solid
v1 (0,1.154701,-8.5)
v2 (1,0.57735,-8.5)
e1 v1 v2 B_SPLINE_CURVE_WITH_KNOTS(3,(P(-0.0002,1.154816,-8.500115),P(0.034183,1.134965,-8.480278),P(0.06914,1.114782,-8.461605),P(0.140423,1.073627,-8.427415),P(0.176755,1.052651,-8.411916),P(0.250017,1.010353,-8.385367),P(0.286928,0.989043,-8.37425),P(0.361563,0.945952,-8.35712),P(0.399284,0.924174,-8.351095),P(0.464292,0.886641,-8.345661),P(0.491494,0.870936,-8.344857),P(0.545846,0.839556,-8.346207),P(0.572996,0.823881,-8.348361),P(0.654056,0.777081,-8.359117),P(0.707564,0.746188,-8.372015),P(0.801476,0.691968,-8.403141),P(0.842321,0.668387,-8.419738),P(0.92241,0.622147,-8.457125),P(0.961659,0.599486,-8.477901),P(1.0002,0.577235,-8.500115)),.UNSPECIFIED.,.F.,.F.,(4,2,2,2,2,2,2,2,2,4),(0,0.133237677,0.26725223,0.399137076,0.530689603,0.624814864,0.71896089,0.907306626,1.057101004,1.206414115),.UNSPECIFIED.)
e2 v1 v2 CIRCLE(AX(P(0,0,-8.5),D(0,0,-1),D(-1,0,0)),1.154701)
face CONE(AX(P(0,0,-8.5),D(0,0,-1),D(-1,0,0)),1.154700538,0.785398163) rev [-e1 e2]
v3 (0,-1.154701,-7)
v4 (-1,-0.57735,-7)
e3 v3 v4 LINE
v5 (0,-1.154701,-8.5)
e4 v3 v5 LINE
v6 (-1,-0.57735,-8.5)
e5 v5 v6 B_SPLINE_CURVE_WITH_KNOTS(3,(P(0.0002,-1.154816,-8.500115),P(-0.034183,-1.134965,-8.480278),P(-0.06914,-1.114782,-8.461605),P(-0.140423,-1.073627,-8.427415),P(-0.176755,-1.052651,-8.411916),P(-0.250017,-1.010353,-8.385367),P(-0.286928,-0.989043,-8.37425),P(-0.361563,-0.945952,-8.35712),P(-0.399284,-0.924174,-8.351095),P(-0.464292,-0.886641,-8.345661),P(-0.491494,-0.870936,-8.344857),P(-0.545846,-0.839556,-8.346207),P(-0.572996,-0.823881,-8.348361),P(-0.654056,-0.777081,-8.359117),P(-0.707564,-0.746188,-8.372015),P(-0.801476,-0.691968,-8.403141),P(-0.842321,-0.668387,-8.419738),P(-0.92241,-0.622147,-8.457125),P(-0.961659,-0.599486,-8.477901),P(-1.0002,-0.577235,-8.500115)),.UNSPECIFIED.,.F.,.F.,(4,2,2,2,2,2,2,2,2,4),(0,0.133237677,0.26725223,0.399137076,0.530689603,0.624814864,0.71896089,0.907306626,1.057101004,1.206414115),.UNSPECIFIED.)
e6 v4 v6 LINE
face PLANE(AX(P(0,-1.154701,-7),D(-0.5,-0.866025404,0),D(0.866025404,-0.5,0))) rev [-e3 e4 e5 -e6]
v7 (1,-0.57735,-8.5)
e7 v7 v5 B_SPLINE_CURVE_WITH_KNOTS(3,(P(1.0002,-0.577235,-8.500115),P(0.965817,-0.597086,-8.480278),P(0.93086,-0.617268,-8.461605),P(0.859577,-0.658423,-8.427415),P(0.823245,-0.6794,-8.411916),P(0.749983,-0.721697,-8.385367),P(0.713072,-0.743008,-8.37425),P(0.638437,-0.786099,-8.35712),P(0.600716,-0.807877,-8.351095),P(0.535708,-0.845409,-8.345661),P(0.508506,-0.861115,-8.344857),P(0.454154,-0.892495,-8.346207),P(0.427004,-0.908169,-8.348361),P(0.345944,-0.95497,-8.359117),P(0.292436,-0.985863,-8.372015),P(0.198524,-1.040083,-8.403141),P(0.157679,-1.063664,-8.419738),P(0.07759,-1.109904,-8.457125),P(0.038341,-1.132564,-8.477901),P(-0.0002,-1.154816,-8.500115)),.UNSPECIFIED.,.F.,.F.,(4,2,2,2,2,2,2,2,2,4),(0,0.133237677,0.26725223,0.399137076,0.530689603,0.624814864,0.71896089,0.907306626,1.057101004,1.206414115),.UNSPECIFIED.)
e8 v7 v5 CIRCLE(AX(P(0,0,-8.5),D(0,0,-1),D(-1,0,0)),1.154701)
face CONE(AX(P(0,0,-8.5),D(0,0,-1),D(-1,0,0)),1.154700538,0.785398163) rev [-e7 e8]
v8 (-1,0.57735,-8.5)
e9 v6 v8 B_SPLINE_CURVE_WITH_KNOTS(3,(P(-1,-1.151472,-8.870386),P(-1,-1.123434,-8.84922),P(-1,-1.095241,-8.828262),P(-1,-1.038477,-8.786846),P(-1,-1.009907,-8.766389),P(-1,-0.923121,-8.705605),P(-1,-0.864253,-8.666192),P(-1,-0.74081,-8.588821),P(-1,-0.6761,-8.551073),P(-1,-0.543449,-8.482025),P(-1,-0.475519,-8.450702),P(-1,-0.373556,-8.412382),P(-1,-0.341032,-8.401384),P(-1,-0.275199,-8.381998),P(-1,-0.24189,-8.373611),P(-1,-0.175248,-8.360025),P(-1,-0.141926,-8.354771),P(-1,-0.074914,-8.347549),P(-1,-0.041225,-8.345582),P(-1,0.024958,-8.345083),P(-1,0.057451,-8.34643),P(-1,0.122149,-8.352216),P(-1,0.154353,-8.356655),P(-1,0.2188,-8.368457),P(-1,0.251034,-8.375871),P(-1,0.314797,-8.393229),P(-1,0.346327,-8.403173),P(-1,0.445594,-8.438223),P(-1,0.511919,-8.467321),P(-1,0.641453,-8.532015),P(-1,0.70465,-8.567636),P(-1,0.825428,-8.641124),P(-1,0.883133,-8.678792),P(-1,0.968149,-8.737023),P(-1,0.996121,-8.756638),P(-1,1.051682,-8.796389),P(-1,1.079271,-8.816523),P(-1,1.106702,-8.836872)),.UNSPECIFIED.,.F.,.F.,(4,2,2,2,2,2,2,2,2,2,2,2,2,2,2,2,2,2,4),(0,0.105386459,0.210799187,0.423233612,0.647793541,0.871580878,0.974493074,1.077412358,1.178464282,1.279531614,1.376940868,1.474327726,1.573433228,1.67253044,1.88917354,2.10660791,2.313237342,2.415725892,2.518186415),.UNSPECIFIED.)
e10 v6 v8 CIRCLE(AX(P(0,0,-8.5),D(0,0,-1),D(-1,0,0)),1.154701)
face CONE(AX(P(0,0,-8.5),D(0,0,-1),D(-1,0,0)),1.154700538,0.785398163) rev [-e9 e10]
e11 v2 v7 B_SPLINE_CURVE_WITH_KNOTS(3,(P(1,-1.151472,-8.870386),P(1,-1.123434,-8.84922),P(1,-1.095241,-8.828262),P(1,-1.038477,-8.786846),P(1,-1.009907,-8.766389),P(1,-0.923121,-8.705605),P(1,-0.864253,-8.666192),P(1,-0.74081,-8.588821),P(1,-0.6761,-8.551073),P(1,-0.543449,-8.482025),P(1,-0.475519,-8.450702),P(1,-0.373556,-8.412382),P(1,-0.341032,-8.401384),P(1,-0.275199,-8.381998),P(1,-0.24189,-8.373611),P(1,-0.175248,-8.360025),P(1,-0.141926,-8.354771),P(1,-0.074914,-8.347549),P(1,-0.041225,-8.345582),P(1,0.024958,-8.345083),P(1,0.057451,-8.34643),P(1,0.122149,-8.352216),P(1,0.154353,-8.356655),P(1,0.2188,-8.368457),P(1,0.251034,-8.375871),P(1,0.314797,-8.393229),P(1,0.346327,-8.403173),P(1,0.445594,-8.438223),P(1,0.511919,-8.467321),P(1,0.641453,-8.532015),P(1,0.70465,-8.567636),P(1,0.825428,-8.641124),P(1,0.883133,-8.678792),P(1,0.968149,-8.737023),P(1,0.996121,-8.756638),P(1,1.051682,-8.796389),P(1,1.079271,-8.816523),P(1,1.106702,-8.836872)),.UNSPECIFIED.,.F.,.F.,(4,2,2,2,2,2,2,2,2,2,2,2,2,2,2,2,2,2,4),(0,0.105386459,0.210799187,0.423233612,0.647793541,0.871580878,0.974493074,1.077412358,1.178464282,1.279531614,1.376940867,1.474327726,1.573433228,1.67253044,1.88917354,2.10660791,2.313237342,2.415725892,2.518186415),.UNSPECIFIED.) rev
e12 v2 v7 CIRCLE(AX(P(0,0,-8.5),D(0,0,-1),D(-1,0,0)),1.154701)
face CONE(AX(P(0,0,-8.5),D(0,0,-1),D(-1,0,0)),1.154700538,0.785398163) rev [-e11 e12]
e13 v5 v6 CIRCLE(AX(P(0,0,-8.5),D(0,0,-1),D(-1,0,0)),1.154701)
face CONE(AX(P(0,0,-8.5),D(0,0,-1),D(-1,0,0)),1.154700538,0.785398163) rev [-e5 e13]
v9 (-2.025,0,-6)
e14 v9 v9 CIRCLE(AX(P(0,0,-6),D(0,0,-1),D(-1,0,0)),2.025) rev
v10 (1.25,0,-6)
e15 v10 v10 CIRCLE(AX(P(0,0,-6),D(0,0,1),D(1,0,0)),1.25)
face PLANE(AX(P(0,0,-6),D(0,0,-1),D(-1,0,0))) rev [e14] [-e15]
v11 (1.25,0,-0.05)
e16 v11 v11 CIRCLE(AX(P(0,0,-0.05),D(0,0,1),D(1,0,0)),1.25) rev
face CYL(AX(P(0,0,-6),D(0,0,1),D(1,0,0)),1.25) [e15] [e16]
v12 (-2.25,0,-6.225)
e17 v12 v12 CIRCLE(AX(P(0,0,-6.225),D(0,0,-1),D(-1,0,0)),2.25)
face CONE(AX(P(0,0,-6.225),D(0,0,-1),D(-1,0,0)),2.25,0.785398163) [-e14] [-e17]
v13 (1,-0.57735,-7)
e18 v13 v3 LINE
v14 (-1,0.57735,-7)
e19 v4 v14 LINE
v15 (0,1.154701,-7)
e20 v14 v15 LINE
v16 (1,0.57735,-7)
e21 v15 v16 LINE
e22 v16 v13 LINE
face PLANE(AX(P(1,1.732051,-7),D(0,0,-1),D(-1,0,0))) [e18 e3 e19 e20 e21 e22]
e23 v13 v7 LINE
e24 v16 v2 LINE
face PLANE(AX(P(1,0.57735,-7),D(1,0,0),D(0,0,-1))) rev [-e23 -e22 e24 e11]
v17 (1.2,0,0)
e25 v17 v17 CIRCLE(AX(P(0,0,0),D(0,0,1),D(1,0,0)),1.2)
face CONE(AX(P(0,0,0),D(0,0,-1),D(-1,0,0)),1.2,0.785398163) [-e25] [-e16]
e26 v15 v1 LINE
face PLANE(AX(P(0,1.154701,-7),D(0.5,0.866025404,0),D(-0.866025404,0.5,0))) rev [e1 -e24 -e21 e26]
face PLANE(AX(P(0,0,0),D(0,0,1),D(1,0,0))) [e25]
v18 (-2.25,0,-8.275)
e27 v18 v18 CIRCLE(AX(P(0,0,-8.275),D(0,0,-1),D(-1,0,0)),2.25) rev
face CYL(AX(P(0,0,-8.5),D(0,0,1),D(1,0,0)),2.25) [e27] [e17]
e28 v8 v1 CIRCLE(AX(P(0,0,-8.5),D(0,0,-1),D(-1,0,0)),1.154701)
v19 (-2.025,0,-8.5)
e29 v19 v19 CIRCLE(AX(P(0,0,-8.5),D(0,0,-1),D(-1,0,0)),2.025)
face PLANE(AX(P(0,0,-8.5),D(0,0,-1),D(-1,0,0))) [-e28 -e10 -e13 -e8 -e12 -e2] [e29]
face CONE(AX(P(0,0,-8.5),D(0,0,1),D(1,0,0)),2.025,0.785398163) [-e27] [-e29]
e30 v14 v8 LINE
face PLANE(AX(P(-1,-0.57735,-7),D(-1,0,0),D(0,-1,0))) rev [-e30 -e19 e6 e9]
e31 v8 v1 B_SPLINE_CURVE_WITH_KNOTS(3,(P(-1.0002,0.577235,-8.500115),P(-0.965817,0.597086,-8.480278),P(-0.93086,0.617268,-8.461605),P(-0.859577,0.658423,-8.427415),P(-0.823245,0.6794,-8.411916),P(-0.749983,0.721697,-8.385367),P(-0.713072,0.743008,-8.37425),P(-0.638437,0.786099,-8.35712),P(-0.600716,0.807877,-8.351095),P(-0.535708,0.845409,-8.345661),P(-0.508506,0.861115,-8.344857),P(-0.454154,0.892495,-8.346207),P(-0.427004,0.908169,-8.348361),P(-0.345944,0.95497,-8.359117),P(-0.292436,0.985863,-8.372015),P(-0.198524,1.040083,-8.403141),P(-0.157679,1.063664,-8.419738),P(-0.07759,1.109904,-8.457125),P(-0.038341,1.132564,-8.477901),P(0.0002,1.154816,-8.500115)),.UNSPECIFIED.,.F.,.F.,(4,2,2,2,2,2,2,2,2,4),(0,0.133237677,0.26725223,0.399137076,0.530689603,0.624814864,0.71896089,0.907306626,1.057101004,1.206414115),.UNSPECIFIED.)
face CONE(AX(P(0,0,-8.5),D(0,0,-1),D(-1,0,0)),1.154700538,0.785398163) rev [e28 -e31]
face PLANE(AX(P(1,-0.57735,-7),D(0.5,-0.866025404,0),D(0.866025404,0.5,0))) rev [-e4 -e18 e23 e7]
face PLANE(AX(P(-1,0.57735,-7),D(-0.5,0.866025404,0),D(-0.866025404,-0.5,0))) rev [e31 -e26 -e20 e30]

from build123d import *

# Parameters (mm, degrees)
SKETCH1_R            = 1.25
EXTRUDE1_DEPTH       = 6
CUT_SWEEP1_PITCH     = 0.45
SKETCH6_R            = 2.25
EXTRUDE2_DEPTH       = 2.5
CUT_EXTRUDE1_DEPTH   = 1.5
CHAMFER1_SIZE        = 0.225
SKETCH10_R           = 1.25
PARTIAL_THREAD_DEPTH = 6
CHAMFER2_SIZE        = 0.05


with BuildPart() as part:
    # Sketch1 → Extrude1 (new body)
    with BuildSketch(Plane.XY):
        Circle(SKETCH1_R)
    extrude(amount=-EXTRUDE1_DEPTH)

    # Cut-Sweep1: arcs per turn and ends read off the stored shape
    # Cut-Sweep1: the profile of Sketch3 profile screwed along a right-hand helix through 16 turns, 6 arcs to a turn; built about Z, then put on its axis
    cut_sweep1_z = Axis((0, 0, 0), (0, 0, 1))
    cut_sweep1_corners = [(1.2503, 0, -0.843923205), (0.957716426, 0, -0.675), (0.957716426, 0, -0.61875), (1.2503, 0, -0.449826795)]
    with BuildLine(mode=Mode.PRIVATE) as cut_sweep1_profile:
        Line(cut_sweep1_corners[0], cut_sweep1_corners[1])
        Line(cut_sweep1_corners[1], cut_sweep1_corners[2])
        Line(cut_sweep1_corners[2], cut_sweep1_corners[3])
        Line(cut_sweep1_corners[3], cut_sweep1_corners[0])
    cut_sweep1_cap = Face(cut_sweep1_profile.wire())
    cut_sweep1_turn_angles = [0, 30, 60, 90, 120, 150, 180, 210, 240, 270, 300, 330, 360]
    cut_sweep1_turn_weights = [1, 0.8660254037844387, 1, 0.8660254037844387, 1, 0.8660254037844387, 1, 0.8660254037844387, 1, 0.8660254037844387, 1, 0.8660254037844387, 1]
    cut_sweep1_turn_rails = [Edge.make_bspline([Vector(p[0], p[1], 0).rotate(cut_sweep1_z, cut_sweep1_turn_angles[k]) / cut_sweep1_turn_weights[k] + Vector(0, 0, p[2] + CUT_SWEEP1_PITCH * cut_sweep1_turn_angles[k] / 360) for k in range(13)], [0, 0, 0, 1, 1, 2, 2, 3, 3, 4, 4, 5, 5, 6, 6, 6], 2, cut_sweep1_turn_weights) for p in cut_sweep1_corners]
    cut_sweep1_turn_sides = [Face.make_surface_from_curves(cut_sweep1_turn_rails[p[0]], cut_sweep1_turn_rails[p[1]]) for p in [(0, 1), (1, 2), (2, 3), (3, 0)]]
    cut_sweep1 = Plane(origin=(0, 0, 0), x_dir=(0, 1, 0), z_dir=(0, 0, -1)) * Solid(Shell([*[p.moved(Location((0, 0, CUT_SWEEP1_PITCH * i))) for i in range(16) for p in cut_sweep1_turn_sides], cut_sweep1_cap, cut_sweep1_cap.rotate(cut_sweep1_z, 5760).moved(Location((0, 0, CUT_SWEEP1_PITCH * 5760 / 360)))]))
    add(cut_sweep1, mode=Mode.SUBTRACT)

    # Sketch4 → Cut-Revolve1 (revolve, cut)
    with BuildSketch(Plane(origin=(0, 0, 0), x_dir=(0, 0, -1), z_dir=(1, 0, 0)), mode=Mode.PRIVATE) as cut_revolve1_sk:
        Polygon((0.382511876, 1.25), (0, 0.703716426), (0, 1.25), align=None)
    revolve(cut_revolve1_sk.sketch.rotate(Axis((0, 0, 0), (0, 0, -1)), 270), axis=Axis((0, 0, 0), (0, 0, -1)), mode=Mode.SUBTRACT)

    # Sketch6 → Extrude2 (add)
    with BuildSketch(Plane(origin=(0, 0, -6), x_dir=(-1, 0, 0), z_dir=(0, 0, -1))):
        Circle(SKETCH6_R)
    extrude(amount=EXTRUDE2_DEPTH)

    # Sketch7 → Cut-Extrude1 (cut)
    with BuildSketch(Plane(origin=(0, 0, -8.5), x_dir=(-1, 0, 0), z_dir=(0, 0, -1))):
        Polygon((0, 1.154700538), (-1, 0.577350269), (-1, -0.577350269), (0, -1.154700538), (1, -0.577350269), (1, 0.577350269), align=None)
    extrude(amount=-CUT_EXTRUDE1_DEPTH, mode=Mode.SUBTRACT)

    # Cut-Extrude2 cone 1 section (through the dimple's axis) → Cut-Extrude2 (revolve, cut)
    with BuildSketch(Plane(origin=(0, 0, -8.5), x_dir=(0, 1, 0), z_dir=(1, 0, 0))):
        Polygon((0, 0), (1.154700538, 0), (0, 1.154700538), align=None)
    revolve(axis=Axis((0, 0, -8.5), (0, 0, 1)), mode=Mode.SUBTRACT)

    # Chamfer1
    chamfer1_edges = [part.edges().sort_by_distance(p)[0] for p in [
        (2.25, 0, -6),
        (2.25, 0, -8.5),
    ]]
    chamfer(chamfer1_edges, length=CHAMFER1_SIZE)


with BuildPart() as body_2:
    # Sketch10 → partial thread (new body)
    with BuildSketch(Plane.XY.offset(-6)):
        Circle(SKETCH10_R)
    extrude(amount=PARTIAL_THREAD_DEPTH)

    # Chamfer2
    chamfer2_edges = [body_2.edges().sort_by_distance(p)[0] for p in [
        (-1.25, 0, 0),
    ]]
    chamfer(chamfer2_edges, length=CHAMFER2_SIZE)


with BuildPart() as part_1:
    add(part.part)

    # Combine1: union body 2
    add(body_2.part)


solid = part_1.part
